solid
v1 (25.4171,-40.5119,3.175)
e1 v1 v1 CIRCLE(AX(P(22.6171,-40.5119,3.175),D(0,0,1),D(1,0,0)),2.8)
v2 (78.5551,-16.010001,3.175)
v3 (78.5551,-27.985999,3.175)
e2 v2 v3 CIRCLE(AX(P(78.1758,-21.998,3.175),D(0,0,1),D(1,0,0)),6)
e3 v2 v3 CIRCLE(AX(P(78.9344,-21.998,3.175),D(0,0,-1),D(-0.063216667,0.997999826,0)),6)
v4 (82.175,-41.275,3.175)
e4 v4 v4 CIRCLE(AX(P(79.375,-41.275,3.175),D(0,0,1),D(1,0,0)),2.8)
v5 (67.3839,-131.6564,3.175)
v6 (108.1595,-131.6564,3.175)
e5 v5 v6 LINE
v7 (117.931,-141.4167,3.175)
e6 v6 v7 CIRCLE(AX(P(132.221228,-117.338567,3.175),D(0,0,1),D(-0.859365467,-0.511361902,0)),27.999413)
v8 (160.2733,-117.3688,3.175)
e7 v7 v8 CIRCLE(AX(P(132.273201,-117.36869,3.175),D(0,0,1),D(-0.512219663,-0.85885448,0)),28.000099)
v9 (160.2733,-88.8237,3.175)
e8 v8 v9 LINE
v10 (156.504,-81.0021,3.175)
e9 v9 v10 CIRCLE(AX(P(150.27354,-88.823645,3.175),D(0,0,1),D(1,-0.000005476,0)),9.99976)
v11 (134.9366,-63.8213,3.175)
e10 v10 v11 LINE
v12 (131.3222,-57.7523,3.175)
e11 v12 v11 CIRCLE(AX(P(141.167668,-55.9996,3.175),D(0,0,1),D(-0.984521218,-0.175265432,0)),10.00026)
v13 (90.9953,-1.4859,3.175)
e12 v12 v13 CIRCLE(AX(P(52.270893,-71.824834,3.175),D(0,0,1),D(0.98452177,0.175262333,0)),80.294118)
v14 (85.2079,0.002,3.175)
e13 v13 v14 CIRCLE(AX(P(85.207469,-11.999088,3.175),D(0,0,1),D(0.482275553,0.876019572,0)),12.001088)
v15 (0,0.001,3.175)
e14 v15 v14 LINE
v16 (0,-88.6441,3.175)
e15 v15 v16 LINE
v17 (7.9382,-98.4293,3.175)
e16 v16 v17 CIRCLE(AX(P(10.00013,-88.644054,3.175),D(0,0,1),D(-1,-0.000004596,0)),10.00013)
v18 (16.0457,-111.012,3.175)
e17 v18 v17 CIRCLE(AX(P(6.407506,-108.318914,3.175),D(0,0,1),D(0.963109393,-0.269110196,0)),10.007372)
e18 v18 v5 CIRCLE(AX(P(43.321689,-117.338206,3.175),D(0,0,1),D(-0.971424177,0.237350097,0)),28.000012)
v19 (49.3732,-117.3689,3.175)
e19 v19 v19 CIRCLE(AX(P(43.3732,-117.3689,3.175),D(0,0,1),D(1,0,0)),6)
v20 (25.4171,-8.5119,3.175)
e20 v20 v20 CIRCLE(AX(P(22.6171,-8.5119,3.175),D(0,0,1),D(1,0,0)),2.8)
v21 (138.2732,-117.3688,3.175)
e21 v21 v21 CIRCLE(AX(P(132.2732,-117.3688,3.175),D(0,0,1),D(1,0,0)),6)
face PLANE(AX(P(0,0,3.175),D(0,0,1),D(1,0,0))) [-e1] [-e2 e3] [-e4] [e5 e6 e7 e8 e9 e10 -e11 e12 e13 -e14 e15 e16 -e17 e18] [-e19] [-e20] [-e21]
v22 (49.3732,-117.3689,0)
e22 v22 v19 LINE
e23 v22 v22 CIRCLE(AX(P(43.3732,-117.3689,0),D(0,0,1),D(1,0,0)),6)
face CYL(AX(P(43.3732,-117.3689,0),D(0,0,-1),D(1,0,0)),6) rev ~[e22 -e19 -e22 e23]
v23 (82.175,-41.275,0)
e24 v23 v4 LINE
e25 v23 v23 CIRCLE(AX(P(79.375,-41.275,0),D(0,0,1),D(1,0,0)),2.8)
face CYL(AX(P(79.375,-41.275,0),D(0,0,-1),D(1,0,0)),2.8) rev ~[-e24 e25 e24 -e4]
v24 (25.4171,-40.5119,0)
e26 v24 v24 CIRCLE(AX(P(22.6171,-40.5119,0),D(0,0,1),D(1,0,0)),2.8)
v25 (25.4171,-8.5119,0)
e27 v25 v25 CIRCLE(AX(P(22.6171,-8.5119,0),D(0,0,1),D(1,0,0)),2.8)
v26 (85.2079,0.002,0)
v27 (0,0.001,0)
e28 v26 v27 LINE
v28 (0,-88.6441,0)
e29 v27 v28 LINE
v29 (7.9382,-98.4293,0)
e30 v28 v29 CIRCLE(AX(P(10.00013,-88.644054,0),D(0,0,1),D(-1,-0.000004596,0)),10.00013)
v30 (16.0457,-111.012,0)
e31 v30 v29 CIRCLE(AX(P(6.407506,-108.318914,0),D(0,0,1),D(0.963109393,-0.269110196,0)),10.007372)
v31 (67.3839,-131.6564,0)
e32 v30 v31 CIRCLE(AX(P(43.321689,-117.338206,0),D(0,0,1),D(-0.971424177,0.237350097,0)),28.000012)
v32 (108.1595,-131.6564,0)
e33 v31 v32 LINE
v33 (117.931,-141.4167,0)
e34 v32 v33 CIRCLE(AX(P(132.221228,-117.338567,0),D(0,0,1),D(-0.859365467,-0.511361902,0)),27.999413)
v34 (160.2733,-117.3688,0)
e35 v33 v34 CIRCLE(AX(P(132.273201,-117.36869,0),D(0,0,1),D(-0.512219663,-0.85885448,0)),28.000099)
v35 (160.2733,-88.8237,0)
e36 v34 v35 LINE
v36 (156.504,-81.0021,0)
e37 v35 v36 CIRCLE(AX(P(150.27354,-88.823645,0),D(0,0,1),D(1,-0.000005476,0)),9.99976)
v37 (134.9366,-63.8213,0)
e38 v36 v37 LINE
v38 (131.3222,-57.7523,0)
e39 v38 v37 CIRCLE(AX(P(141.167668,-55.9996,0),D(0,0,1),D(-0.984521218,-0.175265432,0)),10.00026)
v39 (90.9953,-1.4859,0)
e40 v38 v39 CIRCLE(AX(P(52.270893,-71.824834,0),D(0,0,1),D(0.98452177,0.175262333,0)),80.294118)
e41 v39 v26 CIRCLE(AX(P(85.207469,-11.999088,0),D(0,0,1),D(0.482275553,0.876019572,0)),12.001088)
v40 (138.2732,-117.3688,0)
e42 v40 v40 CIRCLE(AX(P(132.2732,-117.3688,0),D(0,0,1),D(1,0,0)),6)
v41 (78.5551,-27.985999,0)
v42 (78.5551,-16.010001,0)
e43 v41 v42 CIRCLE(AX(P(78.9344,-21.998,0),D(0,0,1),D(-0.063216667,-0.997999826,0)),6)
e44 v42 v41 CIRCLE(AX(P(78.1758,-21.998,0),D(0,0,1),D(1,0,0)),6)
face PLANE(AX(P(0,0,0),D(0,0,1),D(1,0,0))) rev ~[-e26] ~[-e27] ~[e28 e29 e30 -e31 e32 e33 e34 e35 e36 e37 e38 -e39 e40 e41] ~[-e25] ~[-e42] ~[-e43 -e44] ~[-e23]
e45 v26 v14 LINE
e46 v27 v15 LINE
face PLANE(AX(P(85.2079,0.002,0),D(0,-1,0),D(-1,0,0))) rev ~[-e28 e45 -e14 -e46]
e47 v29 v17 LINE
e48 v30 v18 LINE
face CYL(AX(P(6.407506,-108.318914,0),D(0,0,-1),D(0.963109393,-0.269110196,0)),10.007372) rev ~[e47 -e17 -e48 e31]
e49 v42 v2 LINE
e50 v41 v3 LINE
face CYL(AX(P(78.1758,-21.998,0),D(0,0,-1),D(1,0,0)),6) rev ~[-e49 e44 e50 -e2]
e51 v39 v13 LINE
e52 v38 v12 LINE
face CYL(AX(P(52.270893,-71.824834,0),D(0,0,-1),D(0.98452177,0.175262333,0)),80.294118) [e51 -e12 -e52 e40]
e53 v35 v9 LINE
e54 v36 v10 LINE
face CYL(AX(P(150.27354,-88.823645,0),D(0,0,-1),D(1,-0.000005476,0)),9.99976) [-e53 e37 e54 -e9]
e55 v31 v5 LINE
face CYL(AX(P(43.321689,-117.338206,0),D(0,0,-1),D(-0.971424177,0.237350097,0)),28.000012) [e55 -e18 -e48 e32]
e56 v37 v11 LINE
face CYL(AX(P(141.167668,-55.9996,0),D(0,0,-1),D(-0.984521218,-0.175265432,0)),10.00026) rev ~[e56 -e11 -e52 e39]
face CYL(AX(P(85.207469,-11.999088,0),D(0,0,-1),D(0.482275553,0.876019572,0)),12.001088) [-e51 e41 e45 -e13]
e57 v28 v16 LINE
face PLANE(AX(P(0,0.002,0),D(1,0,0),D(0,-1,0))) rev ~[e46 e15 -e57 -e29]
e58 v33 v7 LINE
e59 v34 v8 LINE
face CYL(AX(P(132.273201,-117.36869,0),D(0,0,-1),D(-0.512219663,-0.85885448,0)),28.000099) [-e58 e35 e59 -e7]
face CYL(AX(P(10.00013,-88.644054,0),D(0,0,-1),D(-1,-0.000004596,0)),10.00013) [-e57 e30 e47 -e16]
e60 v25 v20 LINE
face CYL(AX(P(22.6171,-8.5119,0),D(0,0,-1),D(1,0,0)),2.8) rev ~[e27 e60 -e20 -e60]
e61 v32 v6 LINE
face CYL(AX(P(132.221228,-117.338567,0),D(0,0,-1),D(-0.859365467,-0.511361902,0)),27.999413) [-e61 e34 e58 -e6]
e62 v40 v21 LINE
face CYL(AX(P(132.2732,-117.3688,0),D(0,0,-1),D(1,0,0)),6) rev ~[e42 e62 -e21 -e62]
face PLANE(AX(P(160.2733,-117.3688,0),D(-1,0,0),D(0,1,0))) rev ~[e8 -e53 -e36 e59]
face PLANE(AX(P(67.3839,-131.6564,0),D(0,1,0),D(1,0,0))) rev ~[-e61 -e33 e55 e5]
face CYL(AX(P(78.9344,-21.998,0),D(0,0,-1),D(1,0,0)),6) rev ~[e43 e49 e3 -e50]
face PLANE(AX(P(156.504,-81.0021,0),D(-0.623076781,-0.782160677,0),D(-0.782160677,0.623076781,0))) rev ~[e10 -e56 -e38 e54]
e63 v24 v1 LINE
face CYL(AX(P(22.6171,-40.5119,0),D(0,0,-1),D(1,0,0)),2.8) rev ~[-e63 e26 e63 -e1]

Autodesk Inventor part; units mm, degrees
ref_plane "YZ Plane" through (0, 0, 0) normal (1, 0, 0) x (0, 1, 0)
ref_plane "XZ Plane" through (0, 0, 0) normal (0, 1, 0) x (-1, 0, 0)
ref_plane "XY Plane" through (0, 0, 0) normal (0, 0, 1) x (1, 0, 0)
sketch "Sketch1" plane through (0, 0, 0) normal (0, 0, 1) x (1, 0, 0)
  line L0 (90.4273, 0.002) -> (0, 0.002)
  line L1 (0, 0.002) -> (0, -88.6441)
  arc A0 (0, -88.6441) -> (7.9382, -98.4293) centre (10, -88.6441) ccw
  arc A1 (16.0457, -111.012) -> (7.9382, -98.4293) centre (6.4076, -108.3189) ccw
  arc A2 (145.7944, -114.2869) -> (148.0953, -110.4201) centre (146.9707, -112.3688) ccw
  circle A3 centre (97.4707, -122.3689) radius 2.25
  circle A4 centre (97.4707, -112.3689) radius 2.25
  circle A5 centre (78.1758, -122.3689) radius 2.25
  arc A6 (145.7944, -124.2869) -> (148.0953, -120.4201) centre (146.9707, -122.3689) ccw
  circle A7 centre (22.6171, -8.5119) radius 2.8
  circle A8 centre (22.6171, -40.5119) radius 2.8
  circle A9 centre (28.6758, -122.3689) radius 2.25
  circle A10 centre (28.6758, -112.3689) radius 2.25
  circle A11 centre (78.1758, -112.3689) radius 2.25
  circle A12 centre (78.9344, -21.998) radius 3.25
  circle A13 centre (10, -90.6616) radius 3.3
  line L2 (73.0605, -128.2915) -> (33.527, -128.2915)
  arc A14 (32.527, -127.2915) -> (33.527, -128.2915) centre (33.527, -127.2915) ccw
  line L3 (32.527, -127.2915) -> (32.527, -107.4915)
  arc A15 (33.527, -106.4915) -> (32.527, -107.4915) centre (33.527, -107.4915) ccw
  line L4 (33.527, -106.4915) -> (73.0605, -106.4915)
  arc A16 (74.0605, -107.4915) -> (73.0605, -106.4915) centre (73.0605, -107.4915) ccw
  line L5 (74.0605, -107.4915) -> (74.0605, -127.2915)
  arc A17 (73.0605, -128.2915) -> (74.0605, -127.2915) centre (73.0605, -127.2915) ccw
  line L6 (142.1195, -128.2915) -> (102.586, -128.2915)
  arc A18 (101.586, -127.2915) -> (102.586, -128.2915) centre (102.586, -127.2915) ccw
  line L7 (101.586, -127.2915) -> (101.586, -107.4915)
  arc A19 (102.586, -106.4915) -> (101.586, -107.4915) centre (102.586, -107.4915) ccw
  line L8 (102.586, -106.4915) -> (142.1195, -106.4915)
  arc A20 (143.1195, -107.4915) -> (142.1195, -106.4915) centre (142.1195, -107.4915) ccw
  line L9 (143.1195, -107.4915) -> (143.1195, -127.2915)
  arc A21 (142.1195, -128.2915) -> (143.1195, -127.2915) centre (142.1195, -127.2915) ccw
  circle A22 centre (146.9707, -112.3688) radius 2.25
  circle A23 centre (146.9707, -122.3689) radius 2.25
  line L10 (28.6758, -112.3689) -> (146.9707, -112.3688) construction
  line L11 (28.6758, -122.3689) -> (146.9707, -122.3689) construction
  circle A24 centre (43.3732, -117.3689) radius 5.9 construction
  circle A25 centre (132.2732, -117.3688) radius 5.9 construction
  circle A26 centre (43.3732, -117.3689) radius 6
  circle A27 centre (132.2732, -117.3688) radius 6
  line L12 (10, -90.6616) -> (176.2125, -90.6616) construction
  circle A28 centre (78.9344, -21.998) radius 6
  circle A29 centre (79.375, -41.275) radius 2.8
  line L13 (0.0516, 0) -> (0, 0) projected
  line L14 (0, 0) -> (0, -88.6441) projected
  arc A30 (0, -88.6441) -> (8.2038, -98.4815) centre (10, -88.6441) ccw projected
  arc A31 (16.1218, -110.6924) -> (8.2038, -98.4815) centre (6.4076, -108.3189) ccw projected
  arc A32 (16.1218, -110.6924) -> (67.3839, -131.6564) centre (43.3217, -117.3382) ccw projected
  line L15 (67.3839, -131.6564) -> (108.1595, -131.6564) projected
  arc A33 (108.1595, -131.6564) -> (117.931, -141.4167) centre (132.2217, -117.3382) ccw projected
  arc A34 (117.931, -141.4167) -> (160.2733, -117.3688) centre (132.2732, -117.3688) ccw projected
  line L16 (160.2733, -117.3688) -> (160.2733, -88.8237) projected
  arc A35 (160.2733, -88.8237) -> (156.504, -81.0021) centre (150.2733, -88.8237) ccw projected
  line L17 (156.504, -81.0021) -> (134.9366, -63.8213) projected
  arc A36 (131.3222, -57.7523) -> (134.9366, -63.8213) centre (141.1674, -55.9997) ccw projected
  arc A37 (131.3222, -57.7523) -> (90.9953, -1.4859) centre (52.2705, -71.825) ccw projected
  arc A38 (90.9953, -1.4859) -> (85.2079, 0.002) centre (85.2079, -11.998) ccw projected
  line L18 (85.2079, 0.002) -> (0.0516, 0.002) projected
  line L19 (0.0516, 0.002) -> (0.0516, 0) projected
  circle A39 centre (155.0516, -88.6441) radius 3.3 projected
  line L20 (102.586, -106.4915) -> (142.1195, -106.4915) projected
  arc A40 (143.1195, -107.4915) -> (142.1195, -106.4915) centre (142.1195, -107.4915) ccw projected
  line L21 (143.1195, -107.4915) -> (143.1195, -127.2915) projected
  arc A41 (142.1195, -128.2915) -> (143.1195, -127.2915) centre (142.1195, -127.2915) ccw projected
  line L22 (142.1195, -128.2915) -> (102.586, -128.2915) projected
  arc A42 (101.586, -127.2915) -> (102.586, -128.2915) centre (102.586, -127.2915) ccw projected
  line L23 (101.586, -127.2915) -> (101.586, -107.4915) projected
  arc A43 (102.586, -106.4915) -> (101.586, -107.4915) centre (102.586, -107.4915) ccw projected
  line L24 (74.0605, -107.4915) -> (74.0605, -127.2915) projected
  arc A44 (73.0605, -128.2915) -> (74.0605, -127.2915) centre (73.0605, -127.2915) ccw projected
  line L25 (73.0605, -128.2915) -> (33.527, -128.2915) projected
  arc A45 (32.527, -127.2915) -> (33.527, -128.2915) centre (33.527, -127.2915) ccw projected
  line L26 (32.527, -127.2915) -> (32.527, -107.4915) projected
  arc A46 (33.527, -106.4915) -> (32.527, -107.4915) centre (33.527, -107.4915) ccw projected
  line L27 (33.527, -106.4915) -> (73.0605, -106.4915) projected
  arc A47 (74.0605, -107.4915) -> (73.0605, -106.4915) centre (73.0605, -107.4915) ccw projected
  circle A48 centre (28.6758, -112.3689) radius 2.25 projected
  circle A49 centre (28.6758, -122.3689) radius 2.25 projected
  circle A50 centre (78.1758, -21.998) radius 6 projected
  circle A51 centre (78.1758, -122.3689) radius 2.25 projected
  circle A52 centre (97.4707, -112.3689) radius 2.25 projected
  circle A53 centre (146.9707, -112.3688) radius 2.25 projected
  circle A54 centre (146.9707, -122.3689) radius 2.25 projected
  circle A55 centre (22.6171, -8.5119) radius 2.8 projected
  circle A56 centre (22.6171, -40.5119) radius 2.8 projected
  circle A57 centre (97.4707, -122.3689) radius 2.25 projected
  circle A58 centre (78.1758, -112.3689) radius 2.25 projected
  circle A59 centre (10, -88.6441) radius 3.3 projected
  point P0 (0, 0)
  point P1 (58.8546, -117.3689)
  point P2 (148.0953, -110.4201)
  point P3 (151.6186, -98.07)
  point P4 (85.2079, 0.002)
  point P5 (13.142, -89.6529)
  point P6 (6.858, -89.6529)
  point P7 (78.5551, -27.986)
  point P8 (78.5551, -16.01)
  dimension "d2" = 49.5
  dimension "d3" = 49.5
  dimension "d4" = 49.5
  dimension "d5" = 49.5
  dimension "d6" = 10
  dimension "d7" = 12
  dimension "d8" = 12
  dimension "d9" = 6.6
  dimension "d10" = 10
  dimension "d12" = 10
  dimension "d16" = 12
  dimension "d17" = 5.6
  dimension "d18" = 22
extrude "Extrusion1" add sketch "Sketch1" along normal blind 3.175 contours A38 A37 A36 L17 A35 L16 A34 A33 L15 A32 A1 A0 L1 L0 | A22 A2 | A3 | A4 | A5 | A23 A6 | A9 | A10 | A11 | A13 A59 | A59 A13 | A13 A59 | L2 A14 L3 A15 L4 A16 L5 A17 | L6 A18 L7 A19 L8 A20 L9 A21 | A39
properties part number "Intake Sides V4_bearing" material "Polycarbonate, Clear"
